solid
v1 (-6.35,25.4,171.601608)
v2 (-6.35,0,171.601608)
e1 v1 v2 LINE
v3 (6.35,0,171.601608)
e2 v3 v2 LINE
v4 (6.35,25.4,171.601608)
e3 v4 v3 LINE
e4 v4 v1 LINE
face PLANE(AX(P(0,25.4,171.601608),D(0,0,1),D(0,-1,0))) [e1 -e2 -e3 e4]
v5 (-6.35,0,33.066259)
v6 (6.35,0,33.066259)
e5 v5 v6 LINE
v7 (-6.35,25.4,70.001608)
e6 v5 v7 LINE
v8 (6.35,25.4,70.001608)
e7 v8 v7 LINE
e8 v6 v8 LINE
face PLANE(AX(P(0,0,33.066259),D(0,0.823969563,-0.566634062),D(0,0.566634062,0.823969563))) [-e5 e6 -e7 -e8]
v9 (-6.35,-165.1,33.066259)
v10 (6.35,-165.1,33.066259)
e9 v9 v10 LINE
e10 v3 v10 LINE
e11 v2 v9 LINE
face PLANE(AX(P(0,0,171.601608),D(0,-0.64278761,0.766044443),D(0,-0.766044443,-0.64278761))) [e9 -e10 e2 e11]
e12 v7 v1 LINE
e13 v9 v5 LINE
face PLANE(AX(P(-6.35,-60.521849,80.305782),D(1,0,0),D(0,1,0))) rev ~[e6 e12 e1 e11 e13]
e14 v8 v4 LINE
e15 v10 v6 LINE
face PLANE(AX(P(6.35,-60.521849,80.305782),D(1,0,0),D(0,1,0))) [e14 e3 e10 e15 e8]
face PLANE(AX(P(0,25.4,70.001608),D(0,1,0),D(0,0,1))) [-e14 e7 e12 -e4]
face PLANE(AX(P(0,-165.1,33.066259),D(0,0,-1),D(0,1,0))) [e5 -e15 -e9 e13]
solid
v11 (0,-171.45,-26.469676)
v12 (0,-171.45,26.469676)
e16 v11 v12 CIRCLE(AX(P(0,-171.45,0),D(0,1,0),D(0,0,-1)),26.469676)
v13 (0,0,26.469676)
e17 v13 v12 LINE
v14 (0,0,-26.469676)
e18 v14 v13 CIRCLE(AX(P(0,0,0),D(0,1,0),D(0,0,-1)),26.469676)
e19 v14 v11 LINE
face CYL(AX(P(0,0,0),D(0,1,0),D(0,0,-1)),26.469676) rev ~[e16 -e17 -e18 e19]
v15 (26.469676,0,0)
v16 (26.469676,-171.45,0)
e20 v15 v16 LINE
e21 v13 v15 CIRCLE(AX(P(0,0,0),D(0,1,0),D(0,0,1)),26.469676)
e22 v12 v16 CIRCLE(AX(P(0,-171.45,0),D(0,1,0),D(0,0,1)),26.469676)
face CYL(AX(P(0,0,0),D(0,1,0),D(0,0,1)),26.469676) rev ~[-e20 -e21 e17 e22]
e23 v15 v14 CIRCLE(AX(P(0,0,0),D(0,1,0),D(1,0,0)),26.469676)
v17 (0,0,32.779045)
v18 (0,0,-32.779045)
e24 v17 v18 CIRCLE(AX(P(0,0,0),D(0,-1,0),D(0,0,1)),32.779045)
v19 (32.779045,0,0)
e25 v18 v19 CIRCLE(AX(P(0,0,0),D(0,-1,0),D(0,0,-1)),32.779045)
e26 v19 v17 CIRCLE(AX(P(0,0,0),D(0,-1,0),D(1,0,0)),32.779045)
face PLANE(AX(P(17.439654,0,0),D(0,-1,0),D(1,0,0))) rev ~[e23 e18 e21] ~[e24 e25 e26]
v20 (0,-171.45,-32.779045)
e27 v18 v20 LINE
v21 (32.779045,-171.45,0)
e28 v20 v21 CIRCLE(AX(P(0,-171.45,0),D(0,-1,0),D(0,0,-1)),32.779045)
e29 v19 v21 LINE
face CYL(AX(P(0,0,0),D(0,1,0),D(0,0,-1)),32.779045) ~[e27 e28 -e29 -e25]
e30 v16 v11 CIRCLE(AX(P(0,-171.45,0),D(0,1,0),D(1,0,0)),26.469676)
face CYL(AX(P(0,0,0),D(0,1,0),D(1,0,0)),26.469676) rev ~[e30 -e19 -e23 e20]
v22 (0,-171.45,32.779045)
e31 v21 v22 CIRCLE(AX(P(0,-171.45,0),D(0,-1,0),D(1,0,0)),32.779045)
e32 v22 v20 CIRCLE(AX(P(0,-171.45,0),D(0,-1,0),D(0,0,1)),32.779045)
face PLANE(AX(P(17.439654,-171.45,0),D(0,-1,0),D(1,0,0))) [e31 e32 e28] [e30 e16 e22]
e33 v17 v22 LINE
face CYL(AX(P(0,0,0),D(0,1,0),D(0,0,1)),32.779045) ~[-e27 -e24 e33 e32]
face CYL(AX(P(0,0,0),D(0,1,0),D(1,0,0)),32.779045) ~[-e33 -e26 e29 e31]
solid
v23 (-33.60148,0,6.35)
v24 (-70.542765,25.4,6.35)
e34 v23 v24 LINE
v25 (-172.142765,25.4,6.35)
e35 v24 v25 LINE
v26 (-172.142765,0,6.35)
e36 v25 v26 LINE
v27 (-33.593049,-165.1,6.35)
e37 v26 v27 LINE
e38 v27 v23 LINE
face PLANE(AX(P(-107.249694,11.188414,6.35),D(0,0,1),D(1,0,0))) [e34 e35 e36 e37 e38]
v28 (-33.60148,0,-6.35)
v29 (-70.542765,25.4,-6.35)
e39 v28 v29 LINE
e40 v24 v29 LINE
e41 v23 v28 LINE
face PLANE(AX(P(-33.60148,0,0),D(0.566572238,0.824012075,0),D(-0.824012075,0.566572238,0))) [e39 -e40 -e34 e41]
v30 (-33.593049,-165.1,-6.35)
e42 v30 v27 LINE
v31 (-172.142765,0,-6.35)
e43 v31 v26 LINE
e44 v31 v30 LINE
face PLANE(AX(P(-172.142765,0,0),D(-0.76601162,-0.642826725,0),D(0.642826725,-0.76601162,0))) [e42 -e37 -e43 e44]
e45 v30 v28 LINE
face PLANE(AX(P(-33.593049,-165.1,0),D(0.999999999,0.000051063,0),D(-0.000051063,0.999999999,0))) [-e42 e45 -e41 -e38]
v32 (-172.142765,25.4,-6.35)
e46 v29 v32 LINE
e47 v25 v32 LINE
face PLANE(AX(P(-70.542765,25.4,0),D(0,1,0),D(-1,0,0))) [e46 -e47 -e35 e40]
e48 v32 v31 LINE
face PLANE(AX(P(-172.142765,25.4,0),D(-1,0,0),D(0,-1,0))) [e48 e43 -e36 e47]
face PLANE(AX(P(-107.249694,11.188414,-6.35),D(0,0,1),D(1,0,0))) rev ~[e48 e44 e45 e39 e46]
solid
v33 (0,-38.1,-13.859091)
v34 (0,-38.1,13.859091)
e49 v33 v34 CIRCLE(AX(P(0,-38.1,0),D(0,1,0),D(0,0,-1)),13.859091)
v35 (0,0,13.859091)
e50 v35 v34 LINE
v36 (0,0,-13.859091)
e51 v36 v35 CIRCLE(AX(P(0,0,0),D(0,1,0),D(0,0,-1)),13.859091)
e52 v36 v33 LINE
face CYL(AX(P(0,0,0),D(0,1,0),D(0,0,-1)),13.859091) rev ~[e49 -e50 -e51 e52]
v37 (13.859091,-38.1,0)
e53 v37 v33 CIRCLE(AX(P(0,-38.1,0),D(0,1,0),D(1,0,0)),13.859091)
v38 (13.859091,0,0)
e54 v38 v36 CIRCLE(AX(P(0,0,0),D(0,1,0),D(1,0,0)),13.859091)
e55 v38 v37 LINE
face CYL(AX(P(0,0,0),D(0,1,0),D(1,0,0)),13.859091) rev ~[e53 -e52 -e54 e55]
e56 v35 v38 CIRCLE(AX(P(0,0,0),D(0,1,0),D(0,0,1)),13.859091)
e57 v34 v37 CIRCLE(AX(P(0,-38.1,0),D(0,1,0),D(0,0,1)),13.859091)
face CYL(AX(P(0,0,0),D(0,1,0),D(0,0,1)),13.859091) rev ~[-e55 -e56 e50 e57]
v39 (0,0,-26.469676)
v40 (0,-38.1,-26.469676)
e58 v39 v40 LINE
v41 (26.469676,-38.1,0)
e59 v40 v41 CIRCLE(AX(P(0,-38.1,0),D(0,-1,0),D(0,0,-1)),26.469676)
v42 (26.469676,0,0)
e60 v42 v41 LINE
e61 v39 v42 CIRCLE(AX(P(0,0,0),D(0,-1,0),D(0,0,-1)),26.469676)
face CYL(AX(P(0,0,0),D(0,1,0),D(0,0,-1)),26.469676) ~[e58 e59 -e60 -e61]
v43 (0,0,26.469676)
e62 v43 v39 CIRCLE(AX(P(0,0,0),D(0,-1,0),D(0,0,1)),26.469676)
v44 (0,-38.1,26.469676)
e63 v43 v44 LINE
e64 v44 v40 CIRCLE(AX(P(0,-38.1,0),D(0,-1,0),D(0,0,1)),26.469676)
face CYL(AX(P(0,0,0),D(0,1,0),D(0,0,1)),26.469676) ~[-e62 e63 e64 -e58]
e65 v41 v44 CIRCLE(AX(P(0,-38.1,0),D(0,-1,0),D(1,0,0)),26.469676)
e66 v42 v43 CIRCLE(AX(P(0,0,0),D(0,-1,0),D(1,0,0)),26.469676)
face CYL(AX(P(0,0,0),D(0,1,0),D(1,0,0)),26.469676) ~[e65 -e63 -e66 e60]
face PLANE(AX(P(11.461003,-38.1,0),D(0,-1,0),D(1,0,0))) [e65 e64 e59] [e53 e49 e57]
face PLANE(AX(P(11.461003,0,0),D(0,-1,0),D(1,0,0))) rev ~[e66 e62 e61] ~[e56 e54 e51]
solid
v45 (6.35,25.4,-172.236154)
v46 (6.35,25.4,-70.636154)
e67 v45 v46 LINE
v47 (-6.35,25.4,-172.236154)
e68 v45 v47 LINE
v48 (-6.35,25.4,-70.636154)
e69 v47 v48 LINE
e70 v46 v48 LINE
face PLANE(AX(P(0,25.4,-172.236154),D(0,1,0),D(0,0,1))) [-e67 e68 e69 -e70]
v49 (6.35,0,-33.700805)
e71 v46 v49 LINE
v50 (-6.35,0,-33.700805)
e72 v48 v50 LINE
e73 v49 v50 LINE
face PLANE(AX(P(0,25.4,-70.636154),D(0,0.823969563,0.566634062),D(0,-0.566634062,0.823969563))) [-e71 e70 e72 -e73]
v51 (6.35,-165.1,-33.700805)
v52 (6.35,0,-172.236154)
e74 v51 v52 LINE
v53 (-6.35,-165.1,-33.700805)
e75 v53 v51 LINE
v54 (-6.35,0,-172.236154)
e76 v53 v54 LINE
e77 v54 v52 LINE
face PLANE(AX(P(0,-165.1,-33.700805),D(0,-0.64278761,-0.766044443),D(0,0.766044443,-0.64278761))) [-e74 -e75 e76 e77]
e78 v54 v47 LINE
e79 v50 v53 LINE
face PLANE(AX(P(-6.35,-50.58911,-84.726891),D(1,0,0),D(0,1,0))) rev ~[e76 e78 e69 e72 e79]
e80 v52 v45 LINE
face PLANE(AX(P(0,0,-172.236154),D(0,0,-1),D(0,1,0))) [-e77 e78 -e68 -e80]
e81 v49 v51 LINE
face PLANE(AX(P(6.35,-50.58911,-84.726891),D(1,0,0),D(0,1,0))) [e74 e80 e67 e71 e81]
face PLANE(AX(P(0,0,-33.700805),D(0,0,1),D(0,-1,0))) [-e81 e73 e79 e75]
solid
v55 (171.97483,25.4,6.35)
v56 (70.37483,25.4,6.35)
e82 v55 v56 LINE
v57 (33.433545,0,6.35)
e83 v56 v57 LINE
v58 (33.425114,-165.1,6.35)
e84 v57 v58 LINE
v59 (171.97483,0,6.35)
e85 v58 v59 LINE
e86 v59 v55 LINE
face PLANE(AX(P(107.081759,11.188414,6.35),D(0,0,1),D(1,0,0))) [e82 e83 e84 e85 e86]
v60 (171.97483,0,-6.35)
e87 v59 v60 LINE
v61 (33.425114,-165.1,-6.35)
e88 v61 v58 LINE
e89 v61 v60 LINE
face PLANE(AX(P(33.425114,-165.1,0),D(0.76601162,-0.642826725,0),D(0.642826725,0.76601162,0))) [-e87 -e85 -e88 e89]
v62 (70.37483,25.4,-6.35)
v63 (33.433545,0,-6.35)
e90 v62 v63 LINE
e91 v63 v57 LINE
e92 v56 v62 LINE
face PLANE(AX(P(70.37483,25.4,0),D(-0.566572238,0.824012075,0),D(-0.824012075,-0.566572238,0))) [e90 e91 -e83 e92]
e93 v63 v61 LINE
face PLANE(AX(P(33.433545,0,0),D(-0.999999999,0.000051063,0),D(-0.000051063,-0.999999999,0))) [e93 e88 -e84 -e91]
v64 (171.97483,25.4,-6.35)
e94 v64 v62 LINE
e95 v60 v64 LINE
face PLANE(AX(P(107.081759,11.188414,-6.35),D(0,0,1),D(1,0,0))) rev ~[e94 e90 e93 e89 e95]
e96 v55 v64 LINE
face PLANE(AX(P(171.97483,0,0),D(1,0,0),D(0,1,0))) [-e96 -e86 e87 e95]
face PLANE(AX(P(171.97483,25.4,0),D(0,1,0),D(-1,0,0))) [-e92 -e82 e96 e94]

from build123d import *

# Parameters (mm, degrees)
F1_DEPTH = 171.45
F3_DEPTH = 6.35
F5_DEPTH = 6.35
F7_DEPTH = 38.1


# Not quite as in the source:
# - a feature names something its author has since deleted; it is built from what else it names


with BuildPart() as f1:
    # F0 (on Front) → F1 (new body)
    with BuildSketch(Plane.XZ):
        with BuildLine():
            ThreePointArc((0, -32.7790447839), (23.1782848475, -23.1782848475), (32.7790447839, 0))
            ThreePointArc((32.7790447839, 0), (23.1782848475, 23.1782848475), (0, 32.7790447839))
            Line((0, 32.7790447839), (0, 26.4696761765))
            ThreePointArc((0, 26.4696761765), (18.7168875202, 18.7168875202), (26.4696761765, 0))
            ThreePointArc((26.4696761765, 0), (18.7168875202, -18.7168875202), (0, -26.4696761765))
            Line((0, -26.4696761765), (0, -32.7790447839))
        make_face()
        with BuildLine():
            Line((0, 26.4696761765), (0, 32.7790447839))
            ThreePointArc((0, 32.7790447839), (-32.7790447839, 0), (0, -32.7790447839))
            Line((0, -32.7790447839), (0, -26.4696761765))
            ThreePointArc((0, -26.4696761765), (-26.4696761765, 0), (0, 26.4696761765))
        make_face()
    extrude(amount=F1_DEPTH)


with BuildPart() as f3:
    # F2 (on Right) → F3 (new body, symmetric)
    with BuildSketch(Plane.YZ):
        Polygon((0, -33.7008051574), (-165.1, -33.7008051574), (0, -172.2361542648), (25.4, -172.2361542648), (25.4, -70.6361542648), align=None)
    extrude(amount=F3_DEPTH, both=True)


with BuildPart() as f3b:
    # F2 (on Right) → F3, piece 2 (new body, symmetric)
    with BuildSketch(Plane.YZ):
        Polygon((0, 171.6016080213), (-165.1, 33.0662589139), (0, 33.0662589139), align=None)
        Polygon((25.4, 171.6016080213), (0, 171.6016080213), (0, 33.0662589139), (25.4, 70.0016080213), align=None)
    extrude(amount=F3_DEPTH, both=True)


with BuildPart() as f5:
    # F4 (on Top) → F5 (new body, symmetric)
    with BuildSketch(Plane.XY):
        Polygon((70.3748299711, 25.4), (33.4335446524, 0), (171.9748299711, 0), (171.9748299711, 25.4), align=None)
        Polygon((33.4335446524, 0), (33.4251142079, -165.0999997848), (171.9748299711, 0), align=None)
    extrude(amount=F5_DEPTH, both=True)


with BuildPart() as f5b:
    # F4 (on Top) → F5, piece 2 (new body, symmetric)
    with BuildSketch(Plane.XY):
        Polygon((-172.14276502, 25.4), (-172.14276502, 0), (-33.6014797013, 0), (-70.54276502, 25.4), align=None)
        Polygon((-172.14276502, 0), (-33.5930492568, -165.0999997848), (-33.6014797013, 0), align=None)
    extrude(amount=F5_DEPTH, both=True)


with BuildPart() as f7:
    # F0 (on Front) → F7 (new body)
    with BuildSketch(Plane.XZ):
        with BuildLine():
            ThreePointArc((26.4696761765, 0), (18.7168875202, 18.7168875202), (0, 26.4696761765))
            Line((0, 26.4696761765), (0, 13.8590905917))
            ThreePointArc((0, 13.8590905917), (9.7998569385, 9.7998569385), (13.8590905917, 0))
            ThreePointArc((13.8590905917, 0), (9.7998569385, -9.7998569385), (0, -13.8590905917))
            Line((0, -13.8590905917), (0, -26.4696761765))
            ThreePointArc((0, -26.4696761765), (18.7168875202, -18.7168875202), (26.4696761765, 0))
        make_face()
        with BuildLine():
            Line((0, 13.8590905917), (0, 26.4696761765))
            ThreePointArc((0, 26.4696761765), (-26.4696761765, 0), (0, -26.4696761765))
            Line((0, -26.4696761765), (0, -13.8590905917))
            ThreePointArc((0, -13.8590905917), (-13.8590905917, 0), (0, 13.8590905917))
        make_face()
    extrude(amount=F7_DEPTH)


solid = Compound([f1.part, f3.part, f3b.part, f5.part, f5b.part, f7.part])
